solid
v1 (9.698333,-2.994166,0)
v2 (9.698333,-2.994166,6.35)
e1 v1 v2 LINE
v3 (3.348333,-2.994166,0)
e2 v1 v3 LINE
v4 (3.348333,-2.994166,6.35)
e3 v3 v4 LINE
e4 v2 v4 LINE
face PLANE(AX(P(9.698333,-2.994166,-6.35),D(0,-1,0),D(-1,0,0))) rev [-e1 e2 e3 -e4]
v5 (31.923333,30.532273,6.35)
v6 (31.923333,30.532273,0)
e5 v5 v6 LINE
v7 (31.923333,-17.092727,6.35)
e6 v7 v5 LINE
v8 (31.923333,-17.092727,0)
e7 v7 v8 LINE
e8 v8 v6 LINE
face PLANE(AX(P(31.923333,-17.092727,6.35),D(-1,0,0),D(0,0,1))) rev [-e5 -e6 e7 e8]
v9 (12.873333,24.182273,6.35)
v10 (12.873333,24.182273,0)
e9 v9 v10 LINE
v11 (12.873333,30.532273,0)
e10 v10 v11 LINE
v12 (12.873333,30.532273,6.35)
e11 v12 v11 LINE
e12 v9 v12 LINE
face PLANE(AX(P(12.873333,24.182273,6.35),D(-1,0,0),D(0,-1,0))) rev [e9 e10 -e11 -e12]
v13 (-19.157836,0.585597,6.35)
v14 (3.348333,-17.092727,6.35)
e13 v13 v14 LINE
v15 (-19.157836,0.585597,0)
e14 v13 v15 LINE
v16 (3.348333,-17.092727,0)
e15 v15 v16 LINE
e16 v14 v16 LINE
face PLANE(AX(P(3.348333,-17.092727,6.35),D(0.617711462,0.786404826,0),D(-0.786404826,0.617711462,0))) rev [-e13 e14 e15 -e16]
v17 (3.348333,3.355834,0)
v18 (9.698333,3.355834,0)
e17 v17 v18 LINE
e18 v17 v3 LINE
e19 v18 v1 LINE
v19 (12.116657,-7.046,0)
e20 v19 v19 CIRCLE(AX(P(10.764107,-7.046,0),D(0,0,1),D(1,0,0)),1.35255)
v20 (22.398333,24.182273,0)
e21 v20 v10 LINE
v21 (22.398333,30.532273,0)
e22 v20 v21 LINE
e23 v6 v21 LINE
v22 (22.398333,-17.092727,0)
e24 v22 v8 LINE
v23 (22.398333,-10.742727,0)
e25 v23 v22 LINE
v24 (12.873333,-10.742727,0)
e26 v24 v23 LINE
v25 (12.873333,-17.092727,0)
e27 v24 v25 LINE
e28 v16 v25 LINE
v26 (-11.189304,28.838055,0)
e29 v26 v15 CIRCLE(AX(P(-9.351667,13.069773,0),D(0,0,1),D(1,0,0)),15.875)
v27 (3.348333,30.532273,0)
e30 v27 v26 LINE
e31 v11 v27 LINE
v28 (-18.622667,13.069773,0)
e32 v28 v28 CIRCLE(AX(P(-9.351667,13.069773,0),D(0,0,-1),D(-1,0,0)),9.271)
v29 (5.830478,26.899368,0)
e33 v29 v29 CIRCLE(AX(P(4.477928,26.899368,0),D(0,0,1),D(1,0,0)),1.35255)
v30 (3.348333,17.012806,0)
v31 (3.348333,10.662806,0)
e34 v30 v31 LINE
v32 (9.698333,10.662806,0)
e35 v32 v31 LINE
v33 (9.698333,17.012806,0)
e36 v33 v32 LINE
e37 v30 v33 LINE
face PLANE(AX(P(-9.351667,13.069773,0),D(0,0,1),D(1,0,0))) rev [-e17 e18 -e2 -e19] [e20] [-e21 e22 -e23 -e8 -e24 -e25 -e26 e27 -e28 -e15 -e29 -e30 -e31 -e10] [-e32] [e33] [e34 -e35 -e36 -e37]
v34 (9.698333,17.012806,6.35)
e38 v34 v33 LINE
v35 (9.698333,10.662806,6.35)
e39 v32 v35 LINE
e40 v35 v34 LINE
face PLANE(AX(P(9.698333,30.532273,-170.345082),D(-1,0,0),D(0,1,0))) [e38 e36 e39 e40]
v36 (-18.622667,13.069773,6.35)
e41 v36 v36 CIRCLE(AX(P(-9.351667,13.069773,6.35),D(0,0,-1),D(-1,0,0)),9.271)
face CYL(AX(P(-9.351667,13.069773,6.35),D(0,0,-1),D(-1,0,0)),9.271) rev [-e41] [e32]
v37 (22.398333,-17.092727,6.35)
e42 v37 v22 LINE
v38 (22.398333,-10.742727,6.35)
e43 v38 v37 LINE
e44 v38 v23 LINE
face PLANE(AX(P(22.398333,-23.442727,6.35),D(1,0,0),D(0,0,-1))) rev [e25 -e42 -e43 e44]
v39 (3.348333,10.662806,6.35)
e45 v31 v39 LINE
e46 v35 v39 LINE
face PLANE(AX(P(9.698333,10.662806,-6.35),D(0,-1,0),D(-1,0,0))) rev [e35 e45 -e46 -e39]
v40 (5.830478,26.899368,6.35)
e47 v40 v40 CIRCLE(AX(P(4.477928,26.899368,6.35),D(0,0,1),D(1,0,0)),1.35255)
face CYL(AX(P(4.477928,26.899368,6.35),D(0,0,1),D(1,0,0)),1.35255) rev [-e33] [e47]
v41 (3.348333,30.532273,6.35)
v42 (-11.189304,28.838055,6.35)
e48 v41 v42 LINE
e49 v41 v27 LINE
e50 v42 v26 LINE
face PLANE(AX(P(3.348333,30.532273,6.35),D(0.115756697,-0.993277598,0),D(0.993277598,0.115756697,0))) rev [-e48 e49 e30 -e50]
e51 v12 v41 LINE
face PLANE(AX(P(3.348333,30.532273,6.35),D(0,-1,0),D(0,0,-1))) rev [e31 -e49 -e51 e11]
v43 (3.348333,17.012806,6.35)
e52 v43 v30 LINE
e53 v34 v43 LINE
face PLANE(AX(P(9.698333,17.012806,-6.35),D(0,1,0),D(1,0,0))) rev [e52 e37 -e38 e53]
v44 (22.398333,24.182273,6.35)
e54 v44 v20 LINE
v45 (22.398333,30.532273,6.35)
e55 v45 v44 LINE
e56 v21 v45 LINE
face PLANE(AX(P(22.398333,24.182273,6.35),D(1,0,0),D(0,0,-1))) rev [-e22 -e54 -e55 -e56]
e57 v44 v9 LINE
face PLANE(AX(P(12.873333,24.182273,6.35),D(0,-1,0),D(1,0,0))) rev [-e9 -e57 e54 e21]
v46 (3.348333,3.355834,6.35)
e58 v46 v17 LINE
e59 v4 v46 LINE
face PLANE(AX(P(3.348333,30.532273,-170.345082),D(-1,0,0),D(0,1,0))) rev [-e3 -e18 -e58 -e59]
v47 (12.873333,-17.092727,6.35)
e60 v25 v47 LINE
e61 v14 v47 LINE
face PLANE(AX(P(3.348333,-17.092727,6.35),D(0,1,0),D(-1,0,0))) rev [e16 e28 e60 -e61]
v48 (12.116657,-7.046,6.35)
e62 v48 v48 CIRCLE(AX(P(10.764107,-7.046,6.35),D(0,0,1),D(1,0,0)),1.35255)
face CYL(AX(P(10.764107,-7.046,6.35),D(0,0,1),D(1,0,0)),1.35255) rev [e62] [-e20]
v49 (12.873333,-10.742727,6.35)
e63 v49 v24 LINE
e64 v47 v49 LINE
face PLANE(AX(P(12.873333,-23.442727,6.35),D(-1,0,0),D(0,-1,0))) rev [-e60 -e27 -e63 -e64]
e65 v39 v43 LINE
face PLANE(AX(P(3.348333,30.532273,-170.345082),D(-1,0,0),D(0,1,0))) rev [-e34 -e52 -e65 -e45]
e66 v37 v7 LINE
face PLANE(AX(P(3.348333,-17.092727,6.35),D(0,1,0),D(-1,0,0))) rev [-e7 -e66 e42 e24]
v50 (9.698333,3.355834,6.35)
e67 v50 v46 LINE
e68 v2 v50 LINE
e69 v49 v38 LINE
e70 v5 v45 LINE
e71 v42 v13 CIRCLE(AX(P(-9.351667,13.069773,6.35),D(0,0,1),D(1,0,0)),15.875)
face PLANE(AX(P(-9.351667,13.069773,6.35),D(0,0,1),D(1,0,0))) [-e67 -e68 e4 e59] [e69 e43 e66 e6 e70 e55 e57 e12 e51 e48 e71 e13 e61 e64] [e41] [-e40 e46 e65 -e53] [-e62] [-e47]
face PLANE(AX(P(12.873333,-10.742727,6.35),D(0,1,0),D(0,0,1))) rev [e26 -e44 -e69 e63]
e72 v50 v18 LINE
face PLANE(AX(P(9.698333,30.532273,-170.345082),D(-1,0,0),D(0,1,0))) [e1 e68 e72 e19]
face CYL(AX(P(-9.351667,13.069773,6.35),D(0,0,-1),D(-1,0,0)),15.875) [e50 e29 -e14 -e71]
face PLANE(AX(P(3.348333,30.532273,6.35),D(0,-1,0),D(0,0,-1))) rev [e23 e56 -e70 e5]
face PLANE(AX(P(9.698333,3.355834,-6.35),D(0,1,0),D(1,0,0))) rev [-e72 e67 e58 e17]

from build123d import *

# Parameters (mm, degrees)
MASS_DEPTH                = 6.35
SKETCH4_R                 = 9.271
CUT_EXTRUDE1_DEPTH        = 45.627810093
SKETCH3_W                 = 9.525
SKETCH3_H                 = 12.7
CUT_EXTRUDE2_DEPTH        = 45.627810093
F_6_32_TAPPED_HOLE1_D     = 2.7051
F_6_32_TAPPED_HOLE1_DEPTH = 152.4
F_6_32_TAPPED_HOLE1_TIP   = 0.81269403
CAVITY1_START             = -2.994165629
CAVITY1_OUTLINE_W         = 6.35
CAVITY1_OUTLINE_H         = 6.35
CAVITY1_DEPTH             = 6.35
CAVITY1_START_2           = 10.66280621
CAVITY1_2_OUTLINE_W       = 6.35
CAVITY1_2_OUTLINE_H       = 6.35
CAVITY1_2_DEPTH           = 6.35


# Read off the part's stored shape, not the designer's step: Cavity1
with BuildPart() as part:
    # Sketch1 → Mass (new body)
    with BuildSketch(Plane.XY):
        with BuildLine():
            Line((3.348333413, -17.092726624), (31.923333413, -17.092726624))
            Line((31.923333413, -17.092726624), (31.923333413, 30.532273376))
            Line((31.923333413, 30.532273376), (3.348333413, 30.532273376))
            Line((3.348333413, 30.532273376), (-11.189304159, 28.838055246))
            ThreePointArc((-11.189304159, 28.838055246), (-24.630570771, 17.379148263), (-19.157836039, 0.585596764))
            Line((-19.157836039, 0.585596764), (3.348333413, -17.092726624))
        make_face()
    extrude(amount=MASS_DEPTH)

    # Sketch4 → Cut-Extrude1 (cut, through all)
    with BuildSketch(Plane(origin=(0, 0, 0), x_dir=(-1, 0, 0), z_dir=(0, 0, -1))):
        with Locations((9.351666587, 13.069773376)):
            Circle(SKETCH4_R)
    extrude(amount=-CUT_EXTRUDE1_DEPTH, mode=Mode.SUBTRACT)

    # Sketch3 → Cut-Extrude2 (cut, through all)
    with BuildSketch(Plane(origin=(0, 0, 0), x_dir=(-1, 0, 0), z_dir=(0, 0, -1))):
        with Locations((-17.635833413, 30.532273376)):
            Rectangle(SKETCH3_W, SKETCH3_H)
        with Locations((-17.635833413, -17.092726624)):
            Rectangle(SKETCH3_W, SKETCH3_H)
    extrude(amount=-CUT_EXTRUDE2_DEPTH, mode=Mode.SUBTRACT)

    # #6-32 Tapped Hole1
    with Locations(Plane.XY.offset(6.35)):
        with Locations((10.764107125, -7.046000335), (4.47792784, 26.899367802), (-9.351666587, 13.069773376)):
            Hole(F_6_32_TAPPED_HOLE1_D / 2, depth=F_6_32_TAPPED_HOLE1_DEPTH)
            with Locations((0, 0, -(F_6_32_TAPPED_HOLE1_DEPTH + F_6_32_TAPPED_HOLE1_TIP / 2))):  # 118° drill point
                Cone(0, F_6_32_TAPPED_HOLE1_D / 2, F_6_32_TAPPED_HOLE1_TIP, mode=Mode.SUBTRACT)

    # Cavity1 outline → Cavity1 (cut)
    with BuildSketch(Plane(origin=(0, 0, 0), x_dir=(1, 0, 0), z_dir=(0, 1, 0)).offset(CAVITY1_START)):
        with Locations((6.523333416, -3.175)):
            Rectangle(CAVITY1_OUTLINE_W, CAVITY1_OUTLINE_H)
    extrude(amount=CAVITY1_DEPTH, mode=Mode.SUBTRACT)

    # Cavity1 2 outline → Cavity1 2 (cut)
    with BuildSketch(Plane(origin=(0, 0, 0), x_dir=(1, 0, 0), z_dir=(0, 1, 0)).offset(CAVITY1_START_2)):
        with Locations((6.523333416, -3.175)):
            Rectangle(CAVITY1_2_OUTLINE_W, CAVITY1_2_OUTLINE_H)
    extrude(amount=CAVITY1_2_DEPTH, mode=Mode.SUBTRACT)


solid = part.part
